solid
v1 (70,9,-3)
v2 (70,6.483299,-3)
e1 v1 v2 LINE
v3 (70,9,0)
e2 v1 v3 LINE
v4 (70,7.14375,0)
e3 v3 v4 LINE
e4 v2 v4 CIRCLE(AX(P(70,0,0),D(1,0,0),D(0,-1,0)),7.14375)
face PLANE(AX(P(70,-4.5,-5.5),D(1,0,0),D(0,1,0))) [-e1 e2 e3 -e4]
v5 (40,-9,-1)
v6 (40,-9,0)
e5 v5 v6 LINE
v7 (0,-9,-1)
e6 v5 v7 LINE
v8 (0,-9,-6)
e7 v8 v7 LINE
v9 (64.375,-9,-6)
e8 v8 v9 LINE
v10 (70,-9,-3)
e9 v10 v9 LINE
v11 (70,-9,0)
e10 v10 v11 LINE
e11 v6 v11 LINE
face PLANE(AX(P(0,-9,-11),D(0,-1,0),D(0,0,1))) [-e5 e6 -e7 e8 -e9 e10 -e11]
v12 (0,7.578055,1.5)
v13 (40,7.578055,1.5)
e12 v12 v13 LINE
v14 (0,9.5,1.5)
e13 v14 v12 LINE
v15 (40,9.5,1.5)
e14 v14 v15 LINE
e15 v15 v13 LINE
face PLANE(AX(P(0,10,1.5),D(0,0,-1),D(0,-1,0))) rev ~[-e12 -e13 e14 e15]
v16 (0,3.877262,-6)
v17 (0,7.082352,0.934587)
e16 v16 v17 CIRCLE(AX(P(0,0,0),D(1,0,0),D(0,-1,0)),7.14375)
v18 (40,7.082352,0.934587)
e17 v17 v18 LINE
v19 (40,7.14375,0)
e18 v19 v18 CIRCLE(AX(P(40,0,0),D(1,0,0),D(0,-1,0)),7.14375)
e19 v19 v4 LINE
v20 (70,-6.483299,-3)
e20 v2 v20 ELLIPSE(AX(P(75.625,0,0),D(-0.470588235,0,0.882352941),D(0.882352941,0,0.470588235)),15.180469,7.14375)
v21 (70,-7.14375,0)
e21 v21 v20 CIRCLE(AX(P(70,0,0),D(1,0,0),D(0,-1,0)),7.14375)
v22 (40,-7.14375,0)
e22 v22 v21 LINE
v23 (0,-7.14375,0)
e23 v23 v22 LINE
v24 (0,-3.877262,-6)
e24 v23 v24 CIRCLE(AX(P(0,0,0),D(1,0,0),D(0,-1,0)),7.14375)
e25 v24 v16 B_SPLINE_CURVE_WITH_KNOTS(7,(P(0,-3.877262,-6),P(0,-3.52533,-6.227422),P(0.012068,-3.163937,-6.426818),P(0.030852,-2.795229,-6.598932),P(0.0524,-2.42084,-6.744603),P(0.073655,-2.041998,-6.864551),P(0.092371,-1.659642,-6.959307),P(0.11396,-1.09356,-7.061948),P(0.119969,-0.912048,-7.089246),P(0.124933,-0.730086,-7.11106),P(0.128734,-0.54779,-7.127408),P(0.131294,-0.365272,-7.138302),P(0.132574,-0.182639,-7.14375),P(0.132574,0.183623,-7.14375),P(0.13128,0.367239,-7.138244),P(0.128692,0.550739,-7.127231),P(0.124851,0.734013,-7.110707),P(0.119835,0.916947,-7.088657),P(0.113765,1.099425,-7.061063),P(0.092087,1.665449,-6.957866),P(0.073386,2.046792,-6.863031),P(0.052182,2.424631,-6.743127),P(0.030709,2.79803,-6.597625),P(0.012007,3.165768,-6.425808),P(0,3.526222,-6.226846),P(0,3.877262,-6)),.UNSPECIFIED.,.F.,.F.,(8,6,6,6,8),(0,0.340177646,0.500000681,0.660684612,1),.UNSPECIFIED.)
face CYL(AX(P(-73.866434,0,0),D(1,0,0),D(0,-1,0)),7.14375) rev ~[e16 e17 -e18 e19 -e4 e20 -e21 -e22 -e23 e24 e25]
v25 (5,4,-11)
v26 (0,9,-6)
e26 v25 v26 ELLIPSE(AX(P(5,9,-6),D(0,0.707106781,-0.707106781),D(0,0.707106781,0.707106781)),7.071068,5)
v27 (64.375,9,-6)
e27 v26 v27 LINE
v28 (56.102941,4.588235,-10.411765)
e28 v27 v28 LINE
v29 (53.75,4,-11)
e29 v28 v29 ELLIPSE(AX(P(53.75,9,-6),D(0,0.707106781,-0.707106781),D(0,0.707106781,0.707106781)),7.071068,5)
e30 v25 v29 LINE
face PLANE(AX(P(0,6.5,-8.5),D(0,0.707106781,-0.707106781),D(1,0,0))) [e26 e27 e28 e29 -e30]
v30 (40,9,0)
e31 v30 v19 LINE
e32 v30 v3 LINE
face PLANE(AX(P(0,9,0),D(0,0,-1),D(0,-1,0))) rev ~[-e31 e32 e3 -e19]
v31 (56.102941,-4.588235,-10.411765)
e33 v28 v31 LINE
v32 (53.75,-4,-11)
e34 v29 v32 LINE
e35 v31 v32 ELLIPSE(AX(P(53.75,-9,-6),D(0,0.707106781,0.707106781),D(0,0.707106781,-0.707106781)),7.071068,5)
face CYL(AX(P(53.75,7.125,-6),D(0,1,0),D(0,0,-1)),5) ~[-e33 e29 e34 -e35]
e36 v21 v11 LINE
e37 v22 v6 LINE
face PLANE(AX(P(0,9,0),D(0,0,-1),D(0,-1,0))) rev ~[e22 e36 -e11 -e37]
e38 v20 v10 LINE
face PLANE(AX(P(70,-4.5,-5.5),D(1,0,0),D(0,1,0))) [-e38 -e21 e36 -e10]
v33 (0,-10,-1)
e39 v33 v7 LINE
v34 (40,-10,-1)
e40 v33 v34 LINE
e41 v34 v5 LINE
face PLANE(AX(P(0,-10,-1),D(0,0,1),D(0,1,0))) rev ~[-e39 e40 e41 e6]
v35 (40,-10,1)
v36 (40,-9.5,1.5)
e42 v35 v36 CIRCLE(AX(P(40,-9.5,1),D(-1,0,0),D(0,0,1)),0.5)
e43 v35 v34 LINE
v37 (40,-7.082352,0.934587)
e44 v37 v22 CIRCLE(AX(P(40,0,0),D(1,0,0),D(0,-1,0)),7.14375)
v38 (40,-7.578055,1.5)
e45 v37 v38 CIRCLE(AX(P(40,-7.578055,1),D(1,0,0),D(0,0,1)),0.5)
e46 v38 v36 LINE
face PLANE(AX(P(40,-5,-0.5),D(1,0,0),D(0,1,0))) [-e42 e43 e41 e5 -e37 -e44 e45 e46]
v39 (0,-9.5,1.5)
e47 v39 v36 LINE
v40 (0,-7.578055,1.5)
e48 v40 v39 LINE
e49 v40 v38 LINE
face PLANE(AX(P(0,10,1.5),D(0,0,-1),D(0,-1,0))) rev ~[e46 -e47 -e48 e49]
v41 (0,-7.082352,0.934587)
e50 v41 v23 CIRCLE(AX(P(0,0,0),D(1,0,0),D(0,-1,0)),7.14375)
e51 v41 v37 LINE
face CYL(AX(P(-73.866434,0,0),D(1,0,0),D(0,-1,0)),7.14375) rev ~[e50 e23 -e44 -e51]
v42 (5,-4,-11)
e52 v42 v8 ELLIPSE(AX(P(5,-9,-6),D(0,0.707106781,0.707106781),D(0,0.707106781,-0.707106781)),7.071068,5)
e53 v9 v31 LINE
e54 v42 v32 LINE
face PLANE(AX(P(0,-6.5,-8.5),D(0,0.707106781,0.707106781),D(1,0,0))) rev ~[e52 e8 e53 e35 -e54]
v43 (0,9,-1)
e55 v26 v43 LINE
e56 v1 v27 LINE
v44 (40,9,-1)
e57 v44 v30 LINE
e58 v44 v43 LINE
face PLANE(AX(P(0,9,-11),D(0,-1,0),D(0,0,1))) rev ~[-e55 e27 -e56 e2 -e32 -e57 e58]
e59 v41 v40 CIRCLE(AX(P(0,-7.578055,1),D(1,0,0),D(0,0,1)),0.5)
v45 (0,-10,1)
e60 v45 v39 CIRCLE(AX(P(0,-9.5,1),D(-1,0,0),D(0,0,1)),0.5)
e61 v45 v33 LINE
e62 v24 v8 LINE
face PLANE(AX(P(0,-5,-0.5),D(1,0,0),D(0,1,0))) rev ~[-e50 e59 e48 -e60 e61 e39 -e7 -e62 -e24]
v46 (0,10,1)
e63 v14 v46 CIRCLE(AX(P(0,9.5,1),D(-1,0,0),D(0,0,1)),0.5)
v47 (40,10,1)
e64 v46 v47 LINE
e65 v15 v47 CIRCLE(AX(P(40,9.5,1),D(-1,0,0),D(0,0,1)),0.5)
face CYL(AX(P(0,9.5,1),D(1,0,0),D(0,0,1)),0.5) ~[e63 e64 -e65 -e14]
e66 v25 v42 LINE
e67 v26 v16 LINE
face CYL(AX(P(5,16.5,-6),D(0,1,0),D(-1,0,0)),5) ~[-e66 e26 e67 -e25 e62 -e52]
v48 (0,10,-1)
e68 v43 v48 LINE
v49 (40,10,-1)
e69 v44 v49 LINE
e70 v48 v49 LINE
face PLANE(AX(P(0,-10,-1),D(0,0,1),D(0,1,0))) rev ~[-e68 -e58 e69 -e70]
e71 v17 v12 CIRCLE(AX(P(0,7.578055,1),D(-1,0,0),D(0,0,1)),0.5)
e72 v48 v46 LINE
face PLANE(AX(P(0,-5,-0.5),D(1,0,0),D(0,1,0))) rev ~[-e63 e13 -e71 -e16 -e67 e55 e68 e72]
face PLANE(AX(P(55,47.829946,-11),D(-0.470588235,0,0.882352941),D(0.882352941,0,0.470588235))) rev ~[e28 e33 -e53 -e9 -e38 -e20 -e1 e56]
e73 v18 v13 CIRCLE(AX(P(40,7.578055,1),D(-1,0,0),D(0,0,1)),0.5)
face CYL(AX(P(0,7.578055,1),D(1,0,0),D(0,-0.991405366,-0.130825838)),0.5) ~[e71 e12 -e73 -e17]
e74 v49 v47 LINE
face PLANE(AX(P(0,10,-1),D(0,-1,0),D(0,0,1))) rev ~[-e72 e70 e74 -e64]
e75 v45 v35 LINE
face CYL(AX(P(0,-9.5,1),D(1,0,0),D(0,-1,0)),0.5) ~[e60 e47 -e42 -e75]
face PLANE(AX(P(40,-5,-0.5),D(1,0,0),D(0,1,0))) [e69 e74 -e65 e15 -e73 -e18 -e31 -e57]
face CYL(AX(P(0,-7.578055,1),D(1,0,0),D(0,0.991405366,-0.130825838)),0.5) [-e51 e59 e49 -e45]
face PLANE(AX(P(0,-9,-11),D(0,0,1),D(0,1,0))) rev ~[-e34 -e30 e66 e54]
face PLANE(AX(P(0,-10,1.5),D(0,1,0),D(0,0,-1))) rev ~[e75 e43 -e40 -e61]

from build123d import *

# Parameters (mm, degrees)
F0_W        = 9
F0_H        = 11
F2_DEPTH    = 70
F1_W        = 10
F1_H        = 1
F1_H_2      = 1.5
F3_DEPTH    = 40
F4_D        = 14.2875
F5_T1_DEPTH = 95.6598919876
F6_SIZE     = 5
F7_T1_DEPTH = 14.25
F7_T3_DEPTH = 33
F8_R        = 0.5


# Not quite as in the source:
# - a fillet or chamfer that OpenCascade refuses, or shapes differently, is made with other operations: its cross-section is extruded or revolved along the edge and cut away or added
# - a length typed as a fraction of an inch, garbled in the dataset ("3 / 203.2 mm" for 3/8 in), is restored


with BuildPart() as f2:
    # F0 (on Right) → F2 (new body)
    with BuildSketch(Plane.YZ):
        with Locations((-4.5, -5.5)):
            Rectangle(F0_W, F0_H)
        with Locations((4.5, -5.5)):
            Rectangle(F0_W, F0_H)
    extrude(amount=F2_DEPTH)

    # F1 (on Right) → F3 (join)
    with BuildSketch(Plane.YZ):
        with Locations((-5, -0.5)):
            Rectangle(F1_W, F1_H)
        with Locations((5, -0.5)):
            Rectangle(F1_W, F1_H)
        with Locations((5, 0.75)):
            Rectangle(F1_W, F1_H_2)
        with Locations((-5, 0.75)):
            Rectangle(F1_W, F1_H_2)
    extrude(amount=F3_DEPTH)

    # F4 (through all)
    with Locations(Plane(origin=(0, 0, 0), x_dir=(0, 1, 0), z_dir=(-1, 0, 0))):
        with Locations((0, 0)):
            Hole(F4_D / 2)

    # F5: chamfer of 15 x 8 on 1 edges, made by hand

    # F5_s2 → F5_t1 (cut)
    with BuildSketch(Plane.XZ.offset(-47.8299459938)):
        Polygon((55, -11), (70, -3), (70, -11), align=None)
    extrude(amount=F5_T1_DEPTH, mode=Mode.SUBTRACT)

    # F6
    f6_edges = [f2.edges().sort_by_distance(p)[0] for p in [
        (27.5, 9, -11),
        (27.5, -9, -11),
    ]]
    chamfer(f6_edges, length=F6_SIZE)

    # F7: fillet of radius 5 on 2 edges, made by hand

    # F7_s2 → F7_t1 (cut)
    with BuildSketch(Plane.XZ.offset(-7.125)):
        with BuildLine():
            ThreePointArc((53.75, -11), (54.9626781252, -10.8507125007), (56.1029411765, -10.4117647059))
            Line((56.1029411765, -10.4117647059), (55, -11))
            Line((55, -11), (53.75, -11))
        make_face()
    extrude(amount=F7_T1_DEPTH, mode=Mode.SUBTRACT)

    # F7_s4 → F7_t3 (cut)
    with BuildSketch(Plane.XZ.offset(-16.5)):
        with BuildLine():
            ThreePointArc((0, -6), (1.4644660941, -9.5355339059), (5, -11))
            Line((5, -11), (0, -11))
            Line((0, -11), (0, -6))
        make_face()
    extrude(amount=F7_T3_DEPTH, mode=Mode.SUBTRACT)

    # F8
    f8_edges = [f2.edges().sort_by_distance(p)[0] for p in [
        (20, -10, 1.5),
        (20, 10, 1.5),
        (20, -6.984495, 1.5),
        (20, 6.984495, 1.5),
    ]]
    fillet(f8_edges, radius=F8_R)


solid = f2.part
